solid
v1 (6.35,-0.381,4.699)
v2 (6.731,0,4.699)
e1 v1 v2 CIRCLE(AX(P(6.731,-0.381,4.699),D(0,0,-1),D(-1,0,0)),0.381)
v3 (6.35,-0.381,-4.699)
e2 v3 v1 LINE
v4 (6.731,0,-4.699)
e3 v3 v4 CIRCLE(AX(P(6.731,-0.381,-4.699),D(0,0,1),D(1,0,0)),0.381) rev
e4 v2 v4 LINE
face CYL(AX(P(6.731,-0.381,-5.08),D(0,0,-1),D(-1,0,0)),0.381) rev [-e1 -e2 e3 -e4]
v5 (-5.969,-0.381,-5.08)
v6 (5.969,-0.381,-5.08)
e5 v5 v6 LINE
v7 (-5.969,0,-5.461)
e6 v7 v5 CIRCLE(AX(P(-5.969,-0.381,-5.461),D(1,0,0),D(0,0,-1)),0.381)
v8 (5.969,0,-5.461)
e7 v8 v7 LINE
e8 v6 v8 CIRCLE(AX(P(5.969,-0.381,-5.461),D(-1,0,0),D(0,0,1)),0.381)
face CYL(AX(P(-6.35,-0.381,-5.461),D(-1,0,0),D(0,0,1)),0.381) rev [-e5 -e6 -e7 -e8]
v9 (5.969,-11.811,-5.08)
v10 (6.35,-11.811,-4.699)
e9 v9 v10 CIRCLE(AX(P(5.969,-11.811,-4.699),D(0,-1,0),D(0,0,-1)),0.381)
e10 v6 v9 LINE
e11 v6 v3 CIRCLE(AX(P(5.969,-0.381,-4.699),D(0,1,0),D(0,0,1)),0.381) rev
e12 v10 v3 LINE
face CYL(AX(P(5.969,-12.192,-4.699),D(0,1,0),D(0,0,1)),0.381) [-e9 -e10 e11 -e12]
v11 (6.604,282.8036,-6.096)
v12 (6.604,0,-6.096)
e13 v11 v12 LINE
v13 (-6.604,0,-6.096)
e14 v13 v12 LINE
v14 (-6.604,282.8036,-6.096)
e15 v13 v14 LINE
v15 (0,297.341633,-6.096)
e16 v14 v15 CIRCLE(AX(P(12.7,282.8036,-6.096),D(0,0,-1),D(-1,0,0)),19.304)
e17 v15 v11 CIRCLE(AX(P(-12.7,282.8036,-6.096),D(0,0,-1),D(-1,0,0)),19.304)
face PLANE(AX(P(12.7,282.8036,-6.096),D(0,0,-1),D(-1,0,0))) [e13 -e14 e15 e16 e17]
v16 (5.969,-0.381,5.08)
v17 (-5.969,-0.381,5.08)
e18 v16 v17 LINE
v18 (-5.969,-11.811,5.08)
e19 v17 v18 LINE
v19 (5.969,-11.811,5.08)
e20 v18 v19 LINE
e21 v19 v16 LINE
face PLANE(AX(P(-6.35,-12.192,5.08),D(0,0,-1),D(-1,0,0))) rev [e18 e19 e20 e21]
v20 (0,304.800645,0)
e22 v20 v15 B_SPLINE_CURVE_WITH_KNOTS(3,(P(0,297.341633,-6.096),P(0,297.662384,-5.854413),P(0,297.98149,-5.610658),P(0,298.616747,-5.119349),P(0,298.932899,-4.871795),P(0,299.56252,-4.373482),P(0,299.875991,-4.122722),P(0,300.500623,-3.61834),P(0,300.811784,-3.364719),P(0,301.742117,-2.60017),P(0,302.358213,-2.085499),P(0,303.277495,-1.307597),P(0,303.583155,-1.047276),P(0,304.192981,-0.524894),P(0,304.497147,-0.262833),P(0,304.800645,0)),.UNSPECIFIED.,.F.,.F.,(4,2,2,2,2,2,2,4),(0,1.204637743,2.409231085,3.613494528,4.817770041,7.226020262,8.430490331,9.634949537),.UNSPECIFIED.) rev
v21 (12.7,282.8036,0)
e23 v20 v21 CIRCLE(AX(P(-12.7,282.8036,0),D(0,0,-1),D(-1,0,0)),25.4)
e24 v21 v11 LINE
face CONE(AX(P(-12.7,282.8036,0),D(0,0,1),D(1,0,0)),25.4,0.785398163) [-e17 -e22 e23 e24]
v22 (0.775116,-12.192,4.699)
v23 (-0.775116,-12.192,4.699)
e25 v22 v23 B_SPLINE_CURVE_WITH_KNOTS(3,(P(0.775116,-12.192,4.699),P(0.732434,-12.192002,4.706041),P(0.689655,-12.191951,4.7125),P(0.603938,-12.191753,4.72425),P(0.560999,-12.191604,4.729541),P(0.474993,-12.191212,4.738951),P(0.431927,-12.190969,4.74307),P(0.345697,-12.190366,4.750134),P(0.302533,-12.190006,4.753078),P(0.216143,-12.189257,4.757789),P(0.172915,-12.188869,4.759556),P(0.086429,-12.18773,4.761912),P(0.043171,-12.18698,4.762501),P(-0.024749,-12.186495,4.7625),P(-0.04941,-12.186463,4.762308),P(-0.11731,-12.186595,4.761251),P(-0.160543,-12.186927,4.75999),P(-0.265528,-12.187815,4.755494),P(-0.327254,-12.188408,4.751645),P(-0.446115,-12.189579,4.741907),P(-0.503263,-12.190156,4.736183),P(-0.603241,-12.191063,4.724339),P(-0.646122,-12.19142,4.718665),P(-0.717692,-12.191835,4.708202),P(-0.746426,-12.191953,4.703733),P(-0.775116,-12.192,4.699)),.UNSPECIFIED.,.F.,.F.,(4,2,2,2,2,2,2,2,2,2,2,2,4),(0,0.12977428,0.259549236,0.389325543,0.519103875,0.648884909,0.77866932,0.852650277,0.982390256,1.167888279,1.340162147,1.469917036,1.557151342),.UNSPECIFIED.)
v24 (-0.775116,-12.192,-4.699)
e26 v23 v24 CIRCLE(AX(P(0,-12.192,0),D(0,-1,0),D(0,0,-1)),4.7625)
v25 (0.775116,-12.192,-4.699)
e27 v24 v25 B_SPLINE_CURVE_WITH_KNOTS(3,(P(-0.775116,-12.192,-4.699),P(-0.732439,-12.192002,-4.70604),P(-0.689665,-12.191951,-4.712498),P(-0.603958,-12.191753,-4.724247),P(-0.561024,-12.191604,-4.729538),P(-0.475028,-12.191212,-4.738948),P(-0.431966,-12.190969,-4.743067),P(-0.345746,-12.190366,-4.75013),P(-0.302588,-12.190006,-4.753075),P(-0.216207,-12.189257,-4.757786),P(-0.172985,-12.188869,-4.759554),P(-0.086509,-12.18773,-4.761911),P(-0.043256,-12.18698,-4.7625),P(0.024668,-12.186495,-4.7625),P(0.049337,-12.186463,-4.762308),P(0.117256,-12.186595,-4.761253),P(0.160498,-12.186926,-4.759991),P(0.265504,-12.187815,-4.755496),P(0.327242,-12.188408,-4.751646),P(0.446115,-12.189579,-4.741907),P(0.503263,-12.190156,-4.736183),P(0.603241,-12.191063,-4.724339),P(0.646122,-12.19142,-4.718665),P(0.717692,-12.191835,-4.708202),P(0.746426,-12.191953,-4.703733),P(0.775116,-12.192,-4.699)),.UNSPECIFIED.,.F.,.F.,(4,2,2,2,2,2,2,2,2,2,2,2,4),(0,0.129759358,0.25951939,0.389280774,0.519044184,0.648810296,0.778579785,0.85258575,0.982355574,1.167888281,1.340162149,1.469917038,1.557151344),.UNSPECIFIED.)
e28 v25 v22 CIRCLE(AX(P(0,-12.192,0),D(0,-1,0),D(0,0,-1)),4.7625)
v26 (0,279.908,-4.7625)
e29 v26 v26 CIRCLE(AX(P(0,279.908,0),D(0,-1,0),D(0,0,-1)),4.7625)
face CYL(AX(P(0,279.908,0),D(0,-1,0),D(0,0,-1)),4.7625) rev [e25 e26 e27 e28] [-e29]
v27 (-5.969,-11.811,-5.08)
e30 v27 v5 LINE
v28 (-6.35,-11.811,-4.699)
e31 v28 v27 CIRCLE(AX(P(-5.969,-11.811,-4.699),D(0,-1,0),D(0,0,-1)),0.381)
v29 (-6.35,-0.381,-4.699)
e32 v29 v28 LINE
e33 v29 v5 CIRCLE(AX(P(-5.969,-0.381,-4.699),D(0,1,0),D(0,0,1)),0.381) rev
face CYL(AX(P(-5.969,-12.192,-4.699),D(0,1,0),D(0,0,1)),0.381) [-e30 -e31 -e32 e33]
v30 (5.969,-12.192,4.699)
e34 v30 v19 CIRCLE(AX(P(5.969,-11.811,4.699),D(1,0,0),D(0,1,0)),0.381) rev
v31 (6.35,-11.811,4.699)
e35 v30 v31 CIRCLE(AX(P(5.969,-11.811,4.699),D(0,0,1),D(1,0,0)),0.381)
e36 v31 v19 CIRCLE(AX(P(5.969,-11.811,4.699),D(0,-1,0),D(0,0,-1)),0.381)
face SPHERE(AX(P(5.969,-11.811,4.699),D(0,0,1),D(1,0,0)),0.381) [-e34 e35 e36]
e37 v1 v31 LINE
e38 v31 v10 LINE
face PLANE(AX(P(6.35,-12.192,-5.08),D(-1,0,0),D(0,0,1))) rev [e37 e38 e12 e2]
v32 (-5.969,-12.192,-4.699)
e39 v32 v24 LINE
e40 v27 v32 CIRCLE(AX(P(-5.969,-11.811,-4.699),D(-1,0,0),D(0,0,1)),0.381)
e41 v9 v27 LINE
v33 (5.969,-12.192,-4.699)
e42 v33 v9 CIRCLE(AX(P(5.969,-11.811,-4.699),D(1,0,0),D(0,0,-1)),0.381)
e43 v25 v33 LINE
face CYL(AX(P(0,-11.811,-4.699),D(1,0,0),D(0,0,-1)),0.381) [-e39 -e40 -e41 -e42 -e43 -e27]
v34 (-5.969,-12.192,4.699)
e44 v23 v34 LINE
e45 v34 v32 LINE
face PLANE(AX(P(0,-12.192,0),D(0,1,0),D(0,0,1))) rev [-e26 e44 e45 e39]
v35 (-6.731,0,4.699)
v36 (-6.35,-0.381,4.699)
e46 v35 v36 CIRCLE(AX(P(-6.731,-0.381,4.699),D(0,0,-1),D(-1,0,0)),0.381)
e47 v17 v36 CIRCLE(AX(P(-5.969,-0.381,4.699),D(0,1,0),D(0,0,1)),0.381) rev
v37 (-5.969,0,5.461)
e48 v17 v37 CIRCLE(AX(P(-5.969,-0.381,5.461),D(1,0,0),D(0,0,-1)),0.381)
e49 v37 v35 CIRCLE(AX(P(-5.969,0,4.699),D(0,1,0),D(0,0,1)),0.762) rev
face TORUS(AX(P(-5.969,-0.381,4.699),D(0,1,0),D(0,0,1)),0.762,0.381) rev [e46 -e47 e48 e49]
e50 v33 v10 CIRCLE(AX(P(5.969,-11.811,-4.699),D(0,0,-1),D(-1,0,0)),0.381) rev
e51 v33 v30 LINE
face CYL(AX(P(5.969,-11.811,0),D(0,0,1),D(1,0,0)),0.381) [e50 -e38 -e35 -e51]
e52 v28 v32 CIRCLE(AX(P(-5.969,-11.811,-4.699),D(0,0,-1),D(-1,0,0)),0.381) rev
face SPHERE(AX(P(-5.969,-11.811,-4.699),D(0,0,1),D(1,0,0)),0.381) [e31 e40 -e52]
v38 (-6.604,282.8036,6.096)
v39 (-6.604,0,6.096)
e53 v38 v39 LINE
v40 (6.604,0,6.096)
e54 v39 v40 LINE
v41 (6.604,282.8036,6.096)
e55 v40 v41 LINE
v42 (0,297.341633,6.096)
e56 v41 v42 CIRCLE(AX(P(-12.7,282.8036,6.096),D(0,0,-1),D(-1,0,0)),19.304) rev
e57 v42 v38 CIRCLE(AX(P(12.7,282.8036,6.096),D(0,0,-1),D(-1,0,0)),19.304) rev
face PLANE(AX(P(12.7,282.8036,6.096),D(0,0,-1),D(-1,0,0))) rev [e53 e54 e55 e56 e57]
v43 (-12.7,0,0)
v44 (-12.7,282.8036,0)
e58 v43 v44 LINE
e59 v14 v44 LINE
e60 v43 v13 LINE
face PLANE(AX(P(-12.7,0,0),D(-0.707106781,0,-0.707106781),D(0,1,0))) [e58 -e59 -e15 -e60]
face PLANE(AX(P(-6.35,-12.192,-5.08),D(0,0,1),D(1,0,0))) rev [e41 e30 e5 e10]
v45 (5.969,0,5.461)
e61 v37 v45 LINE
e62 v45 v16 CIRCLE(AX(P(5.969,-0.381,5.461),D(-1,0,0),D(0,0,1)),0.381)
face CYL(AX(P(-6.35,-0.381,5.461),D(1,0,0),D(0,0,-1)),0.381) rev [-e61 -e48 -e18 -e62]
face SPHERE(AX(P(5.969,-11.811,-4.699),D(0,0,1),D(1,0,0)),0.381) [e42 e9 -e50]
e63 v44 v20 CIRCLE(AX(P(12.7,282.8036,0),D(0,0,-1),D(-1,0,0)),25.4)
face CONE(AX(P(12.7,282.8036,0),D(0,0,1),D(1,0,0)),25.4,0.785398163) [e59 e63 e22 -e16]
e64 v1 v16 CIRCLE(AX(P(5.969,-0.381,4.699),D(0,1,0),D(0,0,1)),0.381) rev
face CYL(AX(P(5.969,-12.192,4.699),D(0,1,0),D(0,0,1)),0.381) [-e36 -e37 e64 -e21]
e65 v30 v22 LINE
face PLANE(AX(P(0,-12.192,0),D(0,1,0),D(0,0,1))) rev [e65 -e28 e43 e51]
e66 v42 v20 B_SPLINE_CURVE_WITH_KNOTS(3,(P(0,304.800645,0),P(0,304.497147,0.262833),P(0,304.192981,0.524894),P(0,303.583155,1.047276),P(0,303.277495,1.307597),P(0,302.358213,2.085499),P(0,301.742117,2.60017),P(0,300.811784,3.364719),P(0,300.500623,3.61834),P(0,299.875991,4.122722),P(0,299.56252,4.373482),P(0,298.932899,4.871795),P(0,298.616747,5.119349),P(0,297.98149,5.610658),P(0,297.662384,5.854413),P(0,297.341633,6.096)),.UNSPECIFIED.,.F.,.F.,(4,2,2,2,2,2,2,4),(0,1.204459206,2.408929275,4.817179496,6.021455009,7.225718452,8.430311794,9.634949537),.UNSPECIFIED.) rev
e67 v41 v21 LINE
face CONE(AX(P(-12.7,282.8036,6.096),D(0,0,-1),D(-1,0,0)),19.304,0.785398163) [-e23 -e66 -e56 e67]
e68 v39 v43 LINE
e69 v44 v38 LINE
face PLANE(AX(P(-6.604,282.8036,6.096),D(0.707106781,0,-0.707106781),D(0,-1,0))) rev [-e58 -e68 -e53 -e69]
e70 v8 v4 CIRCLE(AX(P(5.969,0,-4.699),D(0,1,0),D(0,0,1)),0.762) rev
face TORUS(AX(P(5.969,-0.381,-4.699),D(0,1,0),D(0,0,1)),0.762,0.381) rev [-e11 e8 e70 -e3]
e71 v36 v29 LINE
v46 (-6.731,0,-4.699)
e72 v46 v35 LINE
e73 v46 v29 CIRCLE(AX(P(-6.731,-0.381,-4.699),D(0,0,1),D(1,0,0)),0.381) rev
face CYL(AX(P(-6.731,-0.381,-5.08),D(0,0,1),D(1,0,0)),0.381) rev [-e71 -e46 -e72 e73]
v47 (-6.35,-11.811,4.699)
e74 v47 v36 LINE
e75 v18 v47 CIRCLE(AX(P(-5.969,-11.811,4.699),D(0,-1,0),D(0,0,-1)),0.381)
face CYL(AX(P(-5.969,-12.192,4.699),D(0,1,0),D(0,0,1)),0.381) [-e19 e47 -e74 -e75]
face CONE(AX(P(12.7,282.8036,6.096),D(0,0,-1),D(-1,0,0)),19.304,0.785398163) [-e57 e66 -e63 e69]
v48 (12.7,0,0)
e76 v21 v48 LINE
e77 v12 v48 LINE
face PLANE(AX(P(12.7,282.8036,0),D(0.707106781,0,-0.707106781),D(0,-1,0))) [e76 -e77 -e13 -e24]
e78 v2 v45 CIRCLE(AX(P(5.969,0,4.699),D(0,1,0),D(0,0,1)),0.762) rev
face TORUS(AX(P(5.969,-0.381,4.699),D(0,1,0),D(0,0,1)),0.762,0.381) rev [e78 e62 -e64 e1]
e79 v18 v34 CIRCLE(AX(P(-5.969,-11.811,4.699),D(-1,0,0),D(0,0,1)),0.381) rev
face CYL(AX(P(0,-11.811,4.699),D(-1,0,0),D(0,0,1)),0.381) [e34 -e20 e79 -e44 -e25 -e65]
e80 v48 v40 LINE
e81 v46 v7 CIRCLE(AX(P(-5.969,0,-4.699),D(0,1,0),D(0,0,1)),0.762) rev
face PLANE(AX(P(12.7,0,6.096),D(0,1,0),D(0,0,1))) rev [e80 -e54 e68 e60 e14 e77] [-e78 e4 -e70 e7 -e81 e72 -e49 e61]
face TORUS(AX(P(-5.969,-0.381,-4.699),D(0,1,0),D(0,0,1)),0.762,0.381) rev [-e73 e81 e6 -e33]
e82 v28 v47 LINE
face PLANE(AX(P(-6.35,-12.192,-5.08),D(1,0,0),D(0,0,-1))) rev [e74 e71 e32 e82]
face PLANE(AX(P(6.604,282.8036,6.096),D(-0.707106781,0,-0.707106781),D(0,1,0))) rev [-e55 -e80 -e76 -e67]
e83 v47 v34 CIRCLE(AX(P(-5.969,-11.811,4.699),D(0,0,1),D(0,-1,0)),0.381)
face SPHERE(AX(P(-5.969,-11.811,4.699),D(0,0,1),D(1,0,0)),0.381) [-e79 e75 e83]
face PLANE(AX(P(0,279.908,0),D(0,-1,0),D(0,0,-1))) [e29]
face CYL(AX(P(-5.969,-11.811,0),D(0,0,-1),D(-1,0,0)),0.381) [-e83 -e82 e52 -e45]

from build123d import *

# Parameters (mm, degrees)
BOSS_EXTRUDE1_DEPTH = 6.096
CHAMFER1_SIZE       = 6.096
SKETCH2_W           = 12.7
SKETCH2_H           = 10.16
BOSS_EXTRUDE2_DEPTH = 12.192
FILLET2_R           = 0.381
SKETCH3_R           = 4.7625
CUT_EXTRUDE1_DEPTH  = 292.1


with BuildPart() as part:
    # Sketch1 → Boss-Extrude1 (new, symmetric)
    with BuildSketch(Plane.XY):
        with BuildLine():
            Line((-12.7, 0), (-12.7, 282.8036))
            ThreePointArc((-12.7, 282.8036), (-9.297045256, 295.5036), (0, 304.800645256))
            ThreePointArc((0, 304.800645256), (9.297045256, 295.5036), (12.7, 282.8036))
            Line((12.7, 282.8036), (12.7, 0))
            Line((12.7, 0), (-12.7, 0))
        make_face()
    extrude(amount=BOSS_EXTRUDE1_DEPTH, both=True)

    # Chamfer1
    chamfer1_edges = [part.edges().sort_by_distance(p)[0] for p in [
        (-9.297045256, 295.5036, -6.096),
        (-12.7, 141.4018, -6.096),
        (-9.297045256, 295.5036, 6.096),
        (-12.7, 141.4018, 6.096),
        (9.297045256, 295.5036, 6.096),
        (12.7, 141.4018, 6.096),
        (9.297045256, 295.5036, -6.096),
        (12.7, 141.4018, -6.096),
    ]]
    chamfer(chamfer1_edges, length=CHAMFER1_SIZE - 0.0001)  # a hair under: the kernel refuses the full size

    # Sketch2 → Boss-Extrude2 (add)
    with BuildSketch(Plane.XZ):
        Rectangle(SKETCH2_W, SKETCH2_H)
    extrude(amount=BOSS_EXTRUDE2_DEPTH)

    # Fillet2
    fillet2_edges = [part.edges().sort_by_distance(p)[0] for p in [
        (6.35, 0, 0),
        (6.35, -6.096, -5.08),
        (0, 0, 5.08),
        (6.35, -6.096, 5.08),
        (-6.35, 0, 0),
        (-6.35, -6.096, 5.08),
        (0, 0, -5.08),
        (-6.35, -6.096, -5.08),
        (6.35, -12.192, 0),
        (0, -12.192, 5.08),
        (-6.35, -12.192, 0),
        (0, -12.192, -5.08),
    ]]
    fillet(fillet2_edges, radius=FILLET2_R)

    # Sketch3 → Cut-Extrude1 (cut)
    with BuildSketch(Plane.XZ.offset(12.192)):
        with Locations(Location((0, 0, 0), (0, 0, 270))):
            Circle(SKETCH3_R)
    extrude(amount=-CUT_EXTRUDE1_DEPTH, mode=Mode.SUBTRACT)


solid = part.part
